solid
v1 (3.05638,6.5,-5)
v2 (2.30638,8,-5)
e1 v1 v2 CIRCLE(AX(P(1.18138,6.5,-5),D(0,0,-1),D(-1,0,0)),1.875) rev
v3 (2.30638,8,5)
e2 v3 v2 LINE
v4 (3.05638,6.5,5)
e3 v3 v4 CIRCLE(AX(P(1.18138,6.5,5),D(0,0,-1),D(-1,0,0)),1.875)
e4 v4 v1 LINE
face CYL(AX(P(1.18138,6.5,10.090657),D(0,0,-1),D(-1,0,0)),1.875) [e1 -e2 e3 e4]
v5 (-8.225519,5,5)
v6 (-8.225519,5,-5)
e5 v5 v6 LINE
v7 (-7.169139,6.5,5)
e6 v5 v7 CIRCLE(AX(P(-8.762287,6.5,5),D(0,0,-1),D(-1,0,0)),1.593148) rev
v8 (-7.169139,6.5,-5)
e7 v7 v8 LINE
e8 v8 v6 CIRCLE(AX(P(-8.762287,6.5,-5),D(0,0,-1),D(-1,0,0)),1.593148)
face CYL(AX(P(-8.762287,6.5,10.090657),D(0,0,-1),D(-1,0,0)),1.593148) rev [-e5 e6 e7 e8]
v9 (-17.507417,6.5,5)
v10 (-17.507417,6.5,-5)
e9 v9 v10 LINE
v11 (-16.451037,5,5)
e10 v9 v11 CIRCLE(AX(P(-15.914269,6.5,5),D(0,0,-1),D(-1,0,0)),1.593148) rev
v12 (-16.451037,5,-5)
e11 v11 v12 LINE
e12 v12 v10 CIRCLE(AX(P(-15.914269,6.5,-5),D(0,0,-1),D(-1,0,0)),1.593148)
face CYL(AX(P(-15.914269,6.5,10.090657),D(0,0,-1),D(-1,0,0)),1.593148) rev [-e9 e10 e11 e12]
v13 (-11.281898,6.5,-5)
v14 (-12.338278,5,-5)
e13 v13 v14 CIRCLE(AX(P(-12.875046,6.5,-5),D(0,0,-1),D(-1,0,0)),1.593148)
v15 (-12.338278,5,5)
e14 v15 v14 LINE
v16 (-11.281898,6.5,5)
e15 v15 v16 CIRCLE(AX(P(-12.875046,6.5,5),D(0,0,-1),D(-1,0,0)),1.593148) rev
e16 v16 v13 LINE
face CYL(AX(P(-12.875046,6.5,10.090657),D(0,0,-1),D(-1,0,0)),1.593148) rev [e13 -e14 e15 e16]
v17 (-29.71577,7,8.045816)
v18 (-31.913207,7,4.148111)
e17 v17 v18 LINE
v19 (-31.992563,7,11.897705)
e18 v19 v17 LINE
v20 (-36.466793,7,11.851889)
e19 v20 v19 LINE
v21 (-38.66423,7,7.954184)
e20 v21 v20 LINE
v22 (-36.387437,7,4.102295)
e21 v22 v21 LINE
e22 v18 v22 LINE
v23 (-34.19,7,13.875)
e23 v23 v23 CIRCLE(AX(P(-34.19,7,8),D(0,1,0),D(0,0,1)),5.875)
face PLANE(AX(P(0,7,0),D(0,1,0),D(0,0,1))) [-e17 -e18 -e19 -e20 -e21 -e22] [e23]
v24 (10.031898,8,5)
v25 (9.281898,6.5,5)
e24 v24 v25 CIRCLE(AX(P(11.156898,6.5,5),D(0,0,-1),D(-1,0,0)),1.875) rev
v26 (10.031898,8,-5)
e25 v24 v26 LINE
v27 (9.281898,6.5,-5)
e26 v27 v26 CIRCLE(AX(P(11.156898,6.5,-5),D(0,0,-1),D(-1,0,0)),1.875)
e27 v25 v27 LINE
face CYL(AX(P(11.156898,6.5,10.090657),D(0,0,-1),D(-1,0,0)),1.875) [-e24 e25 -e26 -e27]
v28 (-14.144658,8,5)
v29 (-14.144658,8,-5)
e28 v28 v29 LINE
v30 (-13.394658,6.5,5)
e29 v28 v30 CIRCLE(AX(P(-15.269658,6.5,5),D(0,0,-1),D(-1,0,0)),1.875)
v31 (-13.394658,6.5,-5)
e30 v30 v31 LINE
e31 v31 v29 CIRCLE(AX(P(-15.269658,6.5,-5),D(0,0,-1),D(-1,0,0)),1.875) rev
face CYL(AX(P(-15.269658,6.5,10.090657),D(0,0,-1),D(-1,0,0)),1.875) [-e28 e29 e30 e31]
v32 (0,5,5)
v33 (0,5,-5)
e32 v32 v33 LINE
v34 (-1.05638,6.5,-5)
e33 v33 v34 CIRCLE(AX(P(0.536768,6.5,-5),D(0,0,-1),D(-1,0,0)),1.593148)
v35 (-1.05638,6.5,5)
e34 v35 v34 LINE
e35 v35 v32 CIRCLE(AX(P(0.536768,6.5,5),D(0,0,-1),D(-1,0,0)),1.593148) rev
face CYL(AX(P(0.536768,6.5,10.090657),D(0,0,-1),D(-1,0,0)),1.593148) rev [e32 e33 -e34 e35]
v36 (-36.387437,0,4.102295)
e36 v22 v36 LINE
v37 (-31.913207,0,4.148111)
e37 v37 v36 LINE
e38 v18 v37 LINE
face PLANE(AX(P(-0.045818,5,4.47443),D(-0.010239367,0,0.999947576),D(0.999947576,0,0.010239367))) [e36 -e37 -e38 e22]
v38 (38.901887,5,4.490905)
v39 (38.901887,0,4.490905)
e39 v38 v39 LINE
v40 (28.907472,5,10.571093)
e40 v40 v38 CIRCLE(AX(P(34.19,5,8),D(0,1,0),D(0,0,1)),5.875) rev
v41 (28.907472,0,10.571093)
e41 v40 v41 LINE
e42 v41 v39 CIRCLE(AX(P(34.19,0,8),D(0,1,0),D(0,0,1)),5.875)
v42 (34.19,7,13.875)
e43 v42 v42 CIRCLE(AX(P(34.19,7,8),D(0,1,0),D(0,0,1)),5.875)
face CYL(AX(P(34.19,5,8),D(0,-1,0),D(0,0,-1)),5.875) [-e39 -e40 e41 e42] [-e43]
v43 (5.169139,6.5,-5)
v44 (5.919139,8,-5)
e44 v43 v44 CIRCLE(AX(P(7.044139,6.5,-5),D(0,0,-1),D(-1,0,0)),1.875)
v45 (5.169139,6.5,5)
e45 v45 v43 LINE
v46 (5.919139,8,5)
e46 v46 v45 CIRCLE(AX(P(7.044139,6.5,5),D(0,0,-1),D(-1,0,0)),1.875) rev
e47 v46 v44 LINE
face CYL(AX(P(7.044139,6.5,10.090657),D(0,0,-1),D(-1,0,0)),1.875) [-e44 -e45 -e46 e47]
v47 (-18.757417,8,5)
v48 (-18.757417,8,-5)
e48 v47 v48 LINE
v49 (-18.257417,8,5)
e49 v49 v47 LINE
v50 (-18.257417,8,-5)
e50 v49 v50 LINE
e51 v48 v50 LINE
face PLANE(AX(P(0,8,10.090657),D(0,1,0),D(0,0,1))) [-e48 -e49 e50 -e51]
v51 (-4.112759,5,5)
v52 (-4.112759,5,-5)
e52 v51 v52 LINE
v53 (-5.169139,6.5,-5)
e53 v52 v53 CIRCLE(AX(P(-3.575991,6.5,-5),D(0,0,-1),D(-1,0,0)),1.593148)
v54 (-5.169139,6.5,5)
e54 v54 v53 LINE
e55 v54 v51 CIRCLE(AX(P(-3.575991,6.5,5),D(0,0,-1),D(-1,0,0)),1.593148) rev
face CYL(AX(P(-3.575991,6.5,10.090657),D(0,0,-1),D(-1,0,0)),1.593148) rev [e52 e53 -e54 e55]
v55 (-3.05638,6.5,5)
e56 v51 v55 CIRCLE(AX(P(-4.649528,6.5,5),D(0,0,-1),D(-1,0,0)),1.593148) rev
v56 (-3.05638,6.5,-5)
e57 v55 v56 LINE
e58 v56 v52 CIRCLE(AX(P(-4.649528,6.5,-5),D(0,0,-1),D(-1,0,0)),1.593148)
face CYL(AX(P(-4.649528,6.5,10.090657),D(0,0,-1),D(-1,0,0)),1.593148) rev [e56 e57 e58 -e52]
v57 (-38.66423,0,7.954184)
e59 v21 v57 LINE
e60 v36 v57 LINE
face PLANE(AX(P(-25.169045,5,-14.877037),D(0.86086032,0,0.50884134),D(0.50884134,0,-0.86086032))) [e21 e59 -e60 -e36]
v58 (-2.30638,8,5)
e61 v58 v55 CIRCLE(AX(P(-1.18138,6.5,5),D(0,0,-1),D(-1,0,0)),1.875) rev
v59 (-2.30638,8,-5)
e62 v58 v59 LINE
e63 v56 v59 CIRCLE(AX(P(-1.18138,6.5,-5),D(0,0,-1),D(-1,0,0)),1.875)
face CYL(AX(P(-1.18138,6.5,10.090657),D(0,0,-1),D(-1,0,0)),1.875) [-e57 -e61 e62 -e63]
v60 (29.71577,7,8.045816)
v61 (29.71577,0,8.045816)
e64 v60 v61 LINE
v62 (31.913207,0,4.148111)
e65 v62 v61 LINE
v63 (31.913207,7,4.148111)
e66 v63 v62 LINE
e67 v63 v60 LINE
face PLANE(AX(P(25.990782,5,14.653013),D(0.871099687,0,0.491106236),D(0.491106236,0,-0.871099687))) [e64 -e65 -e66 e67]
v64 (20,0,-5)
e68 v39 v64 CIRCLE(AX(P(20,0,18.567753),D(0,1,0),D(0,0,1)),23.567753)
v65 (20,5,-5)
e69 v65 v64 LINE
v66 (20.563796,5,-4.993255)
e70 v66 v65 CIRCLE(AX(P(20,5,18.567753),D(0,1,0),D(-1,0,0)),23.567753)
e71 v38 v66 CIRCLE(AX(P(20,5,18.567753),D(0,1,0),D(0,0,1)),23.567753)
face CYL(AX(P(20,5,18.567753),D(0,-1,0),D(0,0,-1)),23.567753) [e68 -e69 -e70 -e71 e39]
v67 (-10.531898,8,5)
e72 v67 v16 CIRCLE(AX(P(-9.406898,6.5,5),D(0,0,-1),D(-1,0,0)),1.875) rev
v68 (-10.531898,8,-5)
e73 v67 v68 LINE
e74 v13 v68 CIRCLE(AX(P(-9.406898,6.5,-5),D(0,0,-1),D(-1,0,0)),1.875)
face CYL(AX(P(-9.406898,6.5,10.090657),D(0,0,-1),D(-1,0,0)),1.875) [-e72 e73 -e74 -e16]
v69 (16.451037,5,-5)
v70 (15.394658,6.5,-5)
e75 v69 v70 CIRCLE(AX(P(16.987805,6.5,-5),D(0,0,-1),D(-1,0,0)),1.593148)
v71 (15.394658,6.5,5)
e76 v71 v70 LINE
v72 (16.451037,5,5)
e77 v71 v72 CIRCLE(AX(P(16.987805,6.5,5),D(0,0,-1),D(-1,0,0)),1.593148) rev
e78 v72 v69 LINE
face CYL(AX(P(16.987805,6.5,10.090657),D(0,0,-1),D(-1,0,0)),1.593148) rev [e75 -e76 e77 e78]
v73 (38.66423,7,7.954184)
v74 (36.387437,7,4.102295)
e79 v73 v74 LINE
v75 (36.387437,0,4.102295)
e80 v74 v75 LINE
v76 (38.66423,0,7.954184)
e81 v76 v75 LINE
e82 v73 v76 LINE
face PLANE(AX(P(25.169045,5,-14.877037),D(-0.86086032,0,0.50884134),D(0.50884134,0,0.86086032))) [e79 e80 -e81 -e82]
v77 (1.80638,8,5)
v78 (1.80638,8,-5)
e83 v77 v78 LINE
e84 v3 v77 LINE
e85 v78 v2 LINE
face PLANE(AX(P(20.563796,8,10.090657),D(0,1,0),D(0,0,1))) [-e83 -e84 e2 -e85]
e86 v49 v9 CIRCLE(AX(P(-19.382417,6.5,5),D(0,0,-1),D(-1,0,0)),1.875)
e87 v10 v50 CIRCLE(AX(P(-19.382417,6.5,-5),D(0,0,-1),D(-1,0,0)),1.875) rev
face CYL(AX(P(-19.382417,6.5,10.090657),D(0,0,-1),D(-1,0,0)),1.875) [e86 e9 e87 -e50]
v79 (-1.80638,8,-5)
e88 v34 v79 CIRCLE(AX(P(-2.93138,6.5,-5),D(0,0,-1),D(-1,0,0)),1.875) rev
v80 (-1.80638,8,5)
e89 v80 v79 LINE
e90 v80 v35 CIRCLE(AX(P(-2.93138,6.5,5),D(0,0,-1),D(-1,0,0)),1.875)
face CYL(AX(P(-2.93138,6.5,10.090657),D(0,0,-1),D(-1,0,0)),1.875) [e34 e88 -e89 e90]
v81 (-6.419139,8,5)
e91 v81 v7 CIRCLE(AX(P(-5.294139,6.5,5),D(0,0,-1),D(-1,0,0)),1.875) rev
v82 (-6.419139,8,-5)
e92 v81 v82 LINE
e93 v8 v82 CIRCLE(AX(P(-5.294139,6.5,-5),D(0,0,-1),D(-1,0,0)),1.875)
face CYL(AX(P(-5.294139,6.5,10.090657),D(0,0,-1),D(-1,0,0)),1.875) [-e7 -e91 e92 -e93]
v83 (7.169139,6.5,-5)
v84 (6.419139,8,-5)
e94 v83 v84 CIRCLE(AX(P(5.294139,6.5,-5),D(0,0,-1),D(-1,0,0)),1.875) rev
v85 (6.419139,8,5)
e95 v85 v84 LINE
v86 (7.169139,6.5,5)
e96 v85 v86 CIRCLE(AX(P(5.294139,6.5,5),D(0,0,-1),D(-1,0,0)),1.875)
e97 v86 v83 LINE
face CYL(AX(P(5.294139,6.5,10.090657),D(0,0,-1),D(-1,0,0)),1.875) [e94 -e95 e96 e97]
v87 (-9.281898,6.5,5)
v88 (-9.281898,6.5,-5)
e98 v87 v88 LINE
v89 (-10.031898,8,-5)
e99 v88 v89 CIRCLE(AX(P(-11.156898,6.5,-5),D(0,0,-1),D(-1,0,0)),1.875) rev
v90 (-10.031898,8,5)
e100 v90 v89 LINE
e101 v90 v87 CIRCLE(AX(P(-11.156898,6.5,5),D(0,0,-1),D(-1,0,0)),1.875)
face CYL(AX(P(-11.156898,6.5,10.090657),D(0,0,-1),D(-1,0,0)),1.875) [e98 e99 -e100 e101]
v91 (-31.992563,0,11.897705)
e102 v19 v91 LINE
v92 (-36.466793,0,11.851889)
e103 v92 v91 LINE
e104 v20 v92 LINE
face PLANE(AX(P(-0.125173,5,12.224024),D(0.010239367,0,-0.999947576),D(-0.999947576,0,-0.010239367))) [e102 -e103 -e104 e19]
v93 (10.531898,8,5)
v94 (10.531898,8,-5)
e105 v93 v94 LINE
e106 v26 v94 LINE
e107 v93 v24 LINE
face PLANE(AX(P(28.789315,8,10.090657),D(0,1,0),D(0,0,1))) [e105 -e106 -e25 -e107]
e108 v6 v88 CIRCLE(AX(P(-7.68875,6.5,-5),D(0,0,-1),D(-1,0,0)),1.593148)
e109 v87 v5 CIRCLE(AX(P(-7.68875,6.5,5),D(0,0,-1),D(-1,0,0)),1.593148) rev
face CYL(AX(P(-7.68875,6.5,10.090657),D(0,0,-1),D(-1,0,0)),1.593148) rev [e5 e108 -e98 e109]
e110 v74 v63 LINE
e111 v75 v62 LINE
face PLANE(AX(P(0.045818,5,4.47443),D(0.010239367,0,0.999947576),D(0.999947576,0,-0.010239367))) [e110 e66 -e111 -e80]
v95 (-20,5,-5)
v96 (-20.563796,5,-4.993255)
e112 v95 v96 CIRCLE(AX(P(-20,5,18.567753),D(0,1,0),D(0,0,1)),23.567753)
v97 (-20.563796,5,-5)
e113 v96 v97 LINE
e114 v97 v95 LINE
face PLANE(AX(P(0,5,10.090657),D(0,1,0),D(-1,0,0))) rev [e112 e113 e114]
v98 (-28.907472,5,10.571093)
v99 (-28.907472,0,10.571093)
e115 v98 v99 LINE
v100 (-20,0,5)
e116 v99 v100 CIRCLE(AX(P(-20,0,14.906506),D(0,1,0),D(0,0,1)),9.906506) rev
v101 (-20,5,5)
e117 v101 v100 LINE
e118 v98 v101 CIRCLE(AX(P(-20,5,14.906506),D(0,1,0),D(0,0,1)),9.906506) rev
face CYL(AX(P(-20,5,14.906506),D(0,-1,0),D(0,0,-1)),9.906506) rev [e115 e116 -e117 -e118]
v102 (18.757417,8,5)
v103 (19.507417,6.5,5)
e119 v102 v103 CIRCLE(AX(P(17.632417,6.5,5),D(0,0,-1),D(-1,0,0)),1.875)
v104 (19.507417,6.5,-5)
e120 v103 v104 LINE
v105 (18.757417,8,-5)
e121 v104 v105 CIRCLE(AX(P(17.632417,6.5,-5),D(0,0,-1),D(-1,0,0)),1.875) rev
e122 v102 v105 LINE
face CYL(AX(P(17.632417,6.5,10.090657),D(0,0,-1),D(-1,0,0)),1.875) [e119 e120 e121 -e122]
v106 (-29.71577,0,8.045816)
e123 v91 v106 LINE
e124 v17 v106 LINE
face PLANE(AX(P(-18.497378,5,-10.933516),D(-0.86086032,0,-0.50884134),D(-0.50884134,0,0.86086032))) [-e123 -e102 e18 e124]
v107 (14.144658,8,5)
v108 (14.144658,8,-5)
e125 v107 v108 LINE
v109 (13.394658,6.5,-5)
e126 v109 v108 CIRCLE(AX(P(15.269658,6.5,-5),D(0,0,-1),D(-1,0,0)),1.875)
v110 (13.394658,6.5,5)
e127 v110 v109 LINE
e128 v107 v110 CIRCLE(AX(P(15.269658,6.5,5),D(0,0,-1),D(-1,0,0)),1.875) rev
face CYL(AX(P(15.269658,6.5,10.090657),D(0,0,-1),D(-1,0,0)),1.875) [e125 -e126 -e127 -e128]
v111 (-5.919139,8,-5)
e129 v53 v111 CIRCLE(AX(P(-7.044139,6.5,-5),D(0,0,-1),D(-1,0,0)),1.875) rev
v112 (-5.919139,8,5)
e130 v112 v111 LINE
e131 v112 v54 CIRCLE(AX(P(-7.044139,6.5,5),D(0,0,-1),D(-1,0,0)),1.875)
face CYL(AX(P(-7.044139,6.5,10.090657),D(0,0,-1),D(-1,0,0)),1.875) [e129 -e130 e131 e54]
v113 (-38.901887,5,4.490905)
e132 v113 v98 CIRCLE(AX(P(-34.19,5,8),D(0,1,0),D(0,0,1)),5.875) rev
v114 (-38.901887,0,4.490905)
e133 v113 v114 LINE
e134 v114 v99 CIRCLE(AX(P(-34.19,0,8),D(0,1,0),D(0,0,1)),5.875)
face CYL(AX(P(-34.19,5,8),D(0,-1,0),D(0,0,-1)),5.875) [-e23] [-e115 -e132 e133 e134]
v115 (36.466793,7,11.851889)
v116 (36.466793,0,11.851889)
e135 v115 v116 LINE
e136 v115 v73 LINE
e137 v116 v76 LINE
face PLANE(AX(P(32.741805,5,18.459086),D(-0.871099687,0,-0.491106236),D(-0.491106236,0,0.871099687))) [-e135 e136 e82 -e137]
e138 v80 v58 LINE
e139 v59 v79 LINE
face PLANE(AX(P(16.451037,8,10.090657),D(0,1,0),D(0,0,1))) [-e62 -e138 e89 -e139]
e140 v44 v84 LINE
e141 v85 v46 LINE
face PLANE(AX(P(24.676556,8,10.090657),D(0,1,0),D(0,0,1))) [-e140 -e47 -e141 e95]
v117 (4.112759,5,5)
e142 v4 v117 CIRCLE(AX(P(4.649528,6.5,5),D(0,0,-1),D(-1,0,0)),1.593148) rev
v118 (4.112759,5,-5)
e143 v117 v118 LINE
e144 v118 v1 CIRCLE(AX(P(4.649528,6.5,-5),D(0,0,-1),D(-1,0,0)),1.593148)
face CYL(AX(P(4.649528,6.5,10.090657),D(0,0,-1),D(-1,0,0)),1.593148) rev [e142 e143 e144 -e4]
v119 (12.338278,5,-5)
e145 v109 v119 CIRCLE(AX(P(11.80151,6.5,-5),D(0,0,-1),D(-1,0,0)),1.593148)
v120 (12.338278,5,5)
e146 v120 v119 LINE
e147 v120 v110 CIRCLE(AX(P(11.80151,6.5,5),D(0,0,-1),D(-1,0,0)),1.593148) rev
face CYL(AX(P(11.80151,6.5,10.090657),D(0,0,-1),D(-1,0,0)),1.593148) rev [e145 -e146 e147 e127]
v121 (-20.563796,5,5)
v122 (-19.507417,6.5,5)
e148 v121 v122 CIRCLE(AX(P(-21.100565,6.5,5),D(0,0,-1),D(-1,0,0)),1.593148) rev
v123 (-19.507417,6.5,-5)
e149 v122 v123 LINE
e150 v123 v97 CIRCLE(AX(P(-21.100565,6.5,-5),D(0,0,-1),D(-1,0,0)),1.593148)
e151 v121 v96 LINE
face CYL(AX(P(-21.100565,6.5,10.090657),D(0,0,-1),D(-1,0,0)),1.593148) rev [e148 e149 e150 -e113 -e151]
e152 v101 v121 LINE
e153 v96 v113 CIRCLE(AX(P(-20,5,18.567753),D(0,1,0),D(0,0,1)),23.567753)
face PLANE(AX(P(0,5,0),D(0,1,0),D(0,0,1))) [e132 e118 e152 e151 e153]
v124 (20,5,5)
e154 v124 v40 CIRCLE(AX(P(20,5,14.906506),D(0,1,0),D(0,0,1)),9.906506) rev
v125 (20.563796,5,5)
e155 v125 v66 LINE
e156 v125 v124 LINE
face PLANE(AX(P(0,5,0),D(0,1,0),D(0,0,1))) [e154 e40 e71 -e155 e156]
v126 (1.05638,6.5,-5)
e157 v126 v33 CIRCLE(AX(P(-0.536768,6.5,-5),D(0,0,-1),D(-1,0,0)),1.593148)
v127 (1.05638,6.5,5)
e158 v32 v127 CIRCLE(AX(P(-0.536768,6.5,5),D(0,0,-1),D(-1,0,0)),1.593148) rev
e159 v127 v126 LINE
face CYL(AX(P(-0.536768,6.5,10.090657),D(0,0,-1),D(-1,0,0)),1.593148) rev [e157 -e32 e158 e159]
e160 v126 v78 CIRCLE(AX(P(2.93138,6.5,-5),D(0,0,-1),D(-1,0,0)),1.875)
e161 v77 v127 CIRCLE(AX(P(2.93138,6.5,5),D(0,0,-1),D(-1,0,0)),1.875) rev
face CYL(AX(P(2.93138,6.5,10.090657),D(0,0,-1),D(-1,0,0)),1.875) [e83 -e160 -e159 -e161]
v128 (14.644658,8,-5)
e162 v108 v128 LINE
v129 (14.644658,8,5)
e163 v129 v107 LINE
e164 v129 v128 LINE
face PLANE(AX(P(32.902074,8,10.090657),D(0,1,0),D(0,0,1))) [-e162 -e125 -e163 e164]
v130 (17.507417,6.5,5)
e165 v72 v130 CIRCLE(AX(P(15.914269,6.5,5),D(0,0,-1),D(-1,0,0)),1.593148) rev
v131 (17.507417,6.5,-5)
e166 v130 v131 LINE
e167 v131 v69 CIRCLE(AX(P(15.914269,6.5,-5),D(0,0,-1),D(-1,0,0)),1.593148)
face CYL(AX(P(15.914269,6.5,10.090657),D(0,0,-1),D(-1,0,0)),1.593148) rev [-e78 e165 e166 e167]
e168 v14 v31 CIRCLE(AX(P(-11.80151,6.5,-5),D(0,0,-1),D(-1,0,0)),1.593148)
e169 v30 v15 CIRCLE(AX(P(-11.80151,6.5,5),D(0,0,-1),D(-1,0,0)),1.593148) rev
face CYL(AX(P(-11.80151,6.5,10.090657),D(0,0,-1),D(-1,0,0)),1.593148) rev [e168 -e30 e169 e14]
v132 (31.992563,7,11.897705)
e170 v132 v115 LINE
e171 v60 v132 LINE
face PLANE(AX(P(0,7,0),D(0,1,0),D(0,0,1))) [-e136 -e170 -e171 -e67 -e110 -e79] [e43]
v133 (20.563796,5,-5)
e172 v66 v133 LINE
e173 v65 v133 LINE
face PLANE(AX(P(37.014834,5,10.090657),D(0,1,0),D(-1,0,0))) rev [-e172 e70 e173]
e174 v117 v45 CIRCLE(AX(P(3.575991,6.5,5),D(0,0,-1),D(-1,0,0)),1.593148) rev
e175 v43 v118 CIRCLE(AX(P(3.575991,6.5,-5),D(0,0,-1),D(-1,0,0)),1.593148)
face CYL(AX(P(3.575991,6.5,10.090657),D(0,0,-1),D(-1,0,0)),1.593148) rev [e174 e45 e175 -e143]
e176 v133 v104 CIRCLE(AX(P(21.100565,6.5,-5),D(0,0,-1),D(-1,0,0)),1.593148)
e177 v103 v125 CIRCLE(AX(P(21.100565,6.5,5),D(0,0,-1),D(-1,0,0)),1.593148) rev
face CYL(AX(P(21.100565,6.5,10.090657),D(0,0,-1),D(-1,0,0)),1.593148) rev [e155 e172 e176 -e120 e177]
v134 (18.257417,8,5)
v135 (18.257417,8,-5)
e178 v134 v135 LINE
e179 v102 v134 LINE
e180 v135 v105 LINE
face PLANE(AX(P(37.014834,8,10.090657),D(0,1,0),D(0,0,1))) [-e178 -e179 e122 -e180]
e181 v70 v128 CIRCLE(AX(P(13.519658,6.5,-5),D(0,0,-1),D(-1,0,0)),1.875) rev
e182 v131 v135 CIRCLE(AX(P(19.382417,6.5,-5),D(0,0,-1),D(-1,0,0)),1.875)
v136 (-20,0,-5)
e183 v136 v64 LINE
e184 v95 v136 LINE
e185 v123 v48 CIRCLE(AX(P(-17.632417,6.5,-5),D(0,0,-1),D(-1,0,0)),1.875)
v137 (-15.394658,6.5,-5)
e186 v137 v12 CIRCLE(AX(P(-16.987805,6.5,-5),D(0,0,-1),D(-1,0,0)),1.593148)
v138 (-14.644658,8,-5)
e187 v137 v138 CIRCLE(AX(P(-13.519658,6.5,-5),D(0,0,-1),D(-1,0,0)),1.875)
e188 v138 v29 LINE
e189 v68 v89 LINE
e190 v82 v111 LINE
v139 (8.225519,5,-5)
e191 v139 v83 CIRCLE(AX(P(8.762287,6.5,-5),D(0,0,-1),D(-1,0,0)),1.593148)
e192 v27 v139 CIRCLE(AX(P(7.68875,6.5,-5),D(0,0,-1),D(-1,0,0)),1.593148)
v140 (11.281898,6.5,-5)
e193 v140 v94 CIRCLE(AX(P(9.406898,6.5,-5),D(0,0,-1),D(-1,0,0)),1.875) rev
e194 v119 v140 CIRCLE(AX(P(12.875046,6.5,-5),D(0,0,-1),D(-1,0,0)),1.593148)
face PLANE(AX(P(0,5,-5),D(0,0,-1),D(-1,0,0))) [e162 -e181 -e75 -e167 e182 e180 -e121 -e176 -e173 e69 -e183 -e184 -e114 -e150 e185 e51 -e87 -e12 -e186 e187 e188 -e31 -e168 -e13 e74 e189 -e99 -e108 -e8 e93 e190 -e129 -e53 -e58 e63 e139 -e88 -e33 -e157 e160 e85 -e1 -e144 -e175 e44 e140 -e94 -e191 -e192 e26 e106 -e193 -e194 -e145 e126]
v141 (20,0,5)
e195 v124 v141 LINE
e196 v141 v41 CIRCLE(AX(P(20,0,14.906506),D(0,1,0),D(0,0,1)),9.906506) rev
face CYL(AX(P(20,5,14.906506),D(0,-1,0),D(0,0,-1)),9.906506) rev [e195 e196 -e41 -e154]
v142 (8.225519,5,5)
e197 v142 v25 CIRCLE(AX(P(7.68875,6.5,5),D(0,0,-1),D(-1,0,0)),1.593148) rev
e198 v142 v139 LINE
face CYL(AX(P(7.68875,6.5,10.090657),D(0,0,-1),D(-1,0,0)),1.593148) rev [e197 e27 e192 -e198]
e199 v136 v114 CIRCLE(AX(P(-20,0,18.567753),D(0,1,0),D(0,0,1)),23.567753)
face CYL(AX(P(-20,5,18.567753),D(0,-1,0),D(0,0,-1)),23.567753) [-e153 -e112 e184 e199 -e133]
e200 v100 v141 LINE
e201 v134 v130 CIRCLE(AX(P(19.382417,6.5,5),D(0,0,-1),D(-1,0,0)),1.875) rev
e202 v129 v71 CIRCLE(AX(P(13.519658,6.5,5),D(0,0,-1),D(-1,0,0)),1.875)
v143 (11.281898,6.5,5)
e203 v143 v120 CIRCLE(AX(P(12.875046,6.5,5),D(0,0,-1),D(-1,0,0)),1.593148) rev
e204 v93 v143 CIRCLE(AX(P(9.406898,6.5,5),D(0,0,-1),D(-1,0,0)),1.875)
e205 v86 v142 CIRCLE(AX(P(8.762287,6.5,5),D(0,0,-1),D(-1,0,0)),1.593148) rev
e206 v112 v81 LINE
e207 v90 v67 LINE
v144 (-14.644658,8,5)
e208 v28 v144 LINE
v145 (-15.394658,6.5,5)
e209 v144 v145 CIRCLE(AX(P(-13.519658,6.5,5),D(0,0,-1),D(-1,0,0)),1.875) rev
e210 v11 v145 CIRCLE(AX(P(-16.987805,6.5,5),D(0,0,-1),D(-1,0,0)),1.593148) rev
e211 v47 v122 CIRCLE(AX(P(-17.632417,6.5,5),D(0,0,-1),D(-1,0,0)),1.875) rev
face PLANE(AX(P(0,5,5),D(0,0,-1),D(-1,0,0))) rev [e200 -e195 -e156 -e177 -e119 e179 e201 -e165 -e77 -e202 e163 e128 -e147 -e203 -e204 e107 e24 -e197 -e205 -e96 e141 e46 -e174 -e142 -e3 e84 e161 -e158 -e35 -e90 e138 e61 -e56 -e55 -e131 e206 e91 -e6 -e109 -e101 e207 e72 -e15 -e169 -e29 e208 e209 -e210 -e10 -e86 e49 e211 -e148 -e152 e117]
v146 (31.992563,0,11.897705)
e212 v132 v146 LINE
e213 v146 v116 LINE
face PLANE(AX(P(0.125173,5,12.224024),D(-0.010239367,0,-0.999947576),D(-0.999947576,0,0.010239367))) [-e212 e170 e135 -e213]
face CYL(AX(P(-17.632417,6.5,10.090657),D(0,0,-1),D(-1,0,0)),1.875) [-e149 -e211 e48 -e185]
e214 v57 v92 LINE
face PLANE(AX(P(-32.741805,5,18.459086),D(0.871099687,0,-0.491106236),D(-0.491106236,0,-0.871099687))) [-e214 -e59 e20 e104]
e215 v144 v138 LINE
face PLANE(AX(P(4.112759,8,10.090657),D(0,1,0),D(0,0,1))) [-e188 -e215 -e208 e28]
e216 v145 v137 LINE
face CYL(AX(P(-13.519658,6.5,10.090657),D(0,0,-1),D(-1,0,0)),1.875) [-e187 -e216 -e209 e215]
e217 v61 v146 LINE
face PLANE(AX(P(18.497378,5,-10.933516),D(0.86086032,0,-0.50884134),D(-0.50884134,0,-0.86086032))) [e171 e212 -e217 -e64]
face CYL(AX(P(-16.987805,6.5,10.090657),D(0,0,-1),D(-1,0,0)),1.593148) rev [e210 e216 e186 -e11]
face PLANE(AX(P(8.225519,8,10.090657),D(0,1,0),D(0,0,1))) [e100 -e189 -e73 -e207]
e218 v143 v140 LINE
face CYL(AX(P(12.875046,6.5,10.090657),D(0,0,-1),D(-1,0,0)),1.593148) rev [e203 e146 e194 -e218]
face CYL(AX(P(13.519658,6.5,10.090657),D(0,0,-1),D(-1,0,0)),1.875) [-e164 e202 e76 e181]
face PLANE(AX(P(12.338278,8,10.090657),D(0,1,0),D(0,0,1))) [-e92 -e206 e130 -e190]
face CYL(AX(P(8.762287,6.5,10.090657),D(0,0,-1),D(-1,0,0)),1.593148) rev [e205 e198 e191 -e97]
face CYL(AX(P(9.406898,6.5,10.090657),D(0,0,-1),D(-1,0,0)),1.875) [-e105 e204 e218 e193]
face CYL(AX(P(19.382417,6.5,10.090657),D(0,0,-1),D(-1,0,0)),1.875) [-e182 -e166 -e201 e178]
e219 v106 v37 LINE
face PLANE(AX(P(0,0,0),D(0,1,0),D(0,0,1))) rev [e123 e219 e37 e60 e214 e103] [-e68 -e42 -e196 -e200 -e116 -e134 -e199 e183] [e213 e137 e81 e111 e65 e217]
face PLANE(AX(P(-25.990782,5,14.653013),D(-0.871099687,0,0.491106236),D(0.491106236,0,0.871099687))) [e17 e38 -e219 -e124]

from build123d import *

# Parameters (mm, degrees)
BOSS_EXTRUDE1_DEPTH             = 5
BOSS_EXTRUDE2_REACH             = 44.693
SKETCH2_W                       = 1
SKETCH2_H                       = 1.5
BOSS_EXTRUDE2_DIRECTION_2_REACH = 44.693
LPATTERN1_COUNT                 = 10
LPATTERN1_PITCH                 = 4.112759299
BOSS_EXTRUDE3_START             = 5
BOSS_EXTRUDE3_OUTLINE_R         = 5.875
BOSS_EXTRUDE3_DEPTH             = 2


# Read off the part's stored shape, not the designer's step: Boss-Extrude3
with BuildPart() as part:
    # Sketch1 → Boss-Extrude1 (new body)
    with BuildSketch(Plane(origin=(0, 0, 0), x_dir=(1, 0, 0), z_dir=(0, 1, 0))):
        with BuildLine():
            ThreePointArc((-38.901886937, -4.490905174), (-37.243453661, -13.019167833), (-28.907471708, -10.571093123))
            ThreePointArc((-28.907471708, -10.571093123), (-25.253097439, -6.507468715), (-20, -5))
            Line((-20, -5), (20, -5))
            ThreePointArc((20, -5), (25.253097439, -6.507468715), (28.907471708, -10.571093123))
            ThreePointArc((28.907471708, -10.571093123), (37.243453661, -13.019167833), (38.901886937, -4.490905174))
            ThreePointArc((38.901886937, -4.490905174), (30.575426833, 2.494044808), (20, 5))
            Line((20, 5), (-20, 5))
            ThreePointArc((-20, 5), (-30.575426833, 2.494044808), (-38.901886937, -4.490905174))
        make_face()
        Polygon((-31.913207445, -4.148110984), (-30.814488671, -6.096963409), (-29.715769982, -8.045815684), (-31.992562537, -11.8977047), (-36.466792555, -11.851889016), (-38.664230018, -7.954184316), (-36.387437463, -4.1022953), align=None, mode=Mode.SUBTRACT)
        Polygon((30.814488669, -6.096963413), (31.913207445, -4.148110984), (36.387437463, -4.1022953), (38.664230018, -7.954184316), (36.466792555, -11.851889016), (31.992562537, -11.8977047), (29.715769982, -8.045815684), align=None, mode=Mode.SUBTRACT)
    extrude(amount=BOSS_EXTRUDE1_DEPTH)

    # Boss-Extrude2: up to this face of the body (flat: up to its plane)
    boss_extrude2_end = Plane(part.part.faces().sort_by_distance((0, 2.5, 5))[0])
    # Sketch2 → Boss-Extrude2 (add, up to the picked face)
    with BuildSketch(Plane.XY, mode=Mode.PRIVATE) as boss_extrude2_sk1:
        with BuildLine():
            ThreePointArc((-19.507416847, 6.5), (-19.798015047, 5.582675362), (-20.563796496, 5))
            Line((-20.563796496, 5), (-18.507416847, 5))
            Line((-18.507416847, 5), (-18.507416847, 6.5))
            Line((-18.507416847, 6.5), (-19.507416847, 6.5))
        make_face()
    boss_extrude2_tool1 = split(extrude(boss_extrude2_sk1.sketch, amount=BOSS_EXTRUDE2_REACH, mode=Mode.PRIVATE), bisect_by=boss_extrude2_end, keep=Keep.BOTH, mode=Mode.PRIVATE)
    # Sketch2 → Boss-Extrude2 (add, up to the picked face)
    with BuildSketch(Plane.XY, mode=Mode.PRIVATE) as boss_extrude2_sk2:
        with Locations((-18.007416847, 5.75)):
            Rectangle(SKETCH2_W, SKETCH2_H)
    boss_extrude2_tool2 = split(extrude(boss_extrude2_sk2.sketch, amount=BOSS_EXTRUDE2_REACH, mode=Mode.PRIVATE), bisect_by=boss_extrude2_end, keep=Keep.BOTH, mode=Mode.PRIVATE)
    # Sketch2 → Boss-Extrude2 (add, up to the picked face)
    with BuildSketch(Plane.XY, mode=Mode.PRIVATE) as boss_extrude2_sk3:
        with BuildLine():
            Line((-17.507416847, 6.5), (-17.507416847, 5))
            Line((-17.507416847, 5), (-16.451037197, 5))
            ThreePointArc((-16.451037197, 5), (-17.216818646, 5.582675362), (-17.507416847, 6.5))
        make_face()
    boss_extrude2_tool3 = split(extrude(boss_extrude2_sk3.sketch, amount=BOSS_EXTRUDE2_REACH, mode=Mode.PRIVATE), bisect_by=boss_extrude2_end, keep=Keep.BOTH, mode=Mode.PRIVATE)
    # Sketch2 → Boss-Extrude2 (add, up to the picked face)
    with BuildSketch(Plane.XY, mode=Mode.PRIVATE) as boss_extrude2_sk4:
        with BuildLine():
            Line((-18.507416847, 8), (-18.507416847, 6.5))
            Line((-18.507416847, 6.5), (-17.507416847, 6.5))
            ThreePointArc((-17.507416847, 6.5), (-17.705365863, 7.338525492), (-18.257416847, 8))
            Line((-18.257416847, 8), (-18.507416847, 8))
        make_face()
    boss_extrude2_tool4 = split(extrude(boss_extrude2_sk4.sketch, amount=BOSS_EXTRUDE2_REACH, mode=Mode.PRIVATE), bisect_by=boss_extrude2_end, keep=Keep.BOTH, mode=Mode.PRIVATE)
    # Sketch2 → Boss-Extrude2 (add, up to the picked face)
    with BuildSketch(Plane.XY, mode=Mode.PRIVATE) as boss_extrude2_sk5:
        with BuildLine():
            ThreePointArc((-18.757416847, 8), (-19.30946783, 7.338525492), (-19.507416847, 6.5))
            Line((-19.507416847, 6.5), (-18.507416847, 6.5))
            Line((-18.507416847, 6.5), (-18.507416847, 8))
            Line((-18.507416847, 8), (-18.757416847, 8))
        make_face()
    boss_extrude2_tool5 = split(extrude(boss_extrude2_sk5.sketch, amount=BOSS_EXTRUDE2_REACH, mode=Mode.PRIVATE), bisect_by=boss_extrude2_end, keep=Keep.BOTH, mode=Mode.PRIVATE)
    boss_extrude2_1 = boss_extrude2_tool1.solids().sort_by(Axis((-19.182136, 5.660038, 0), (0, 0, 1)))[0]
    add(boss_extrude2_1)
    boss_extrude2_2 = boss_extrude2_tool2.solids().sort_by(Axis((-18.007417, 5.75, 0), (0, 0, 1)))[0]
    add(boss_extrude2_2)
    boss_extrude2_3 = boss_extrude2_tool3.solids().sort_by(Axis((-17.222958, 5.346083, 0), (0, 0, 1)))[0]
    add(boss_extrude2_3)
    boss_extrude2_4 = boss_extrude2_tool4.solids().sort_by(Axis((-18.090718, 7.135758, 0), (0, 0, 1)))[0]
    add(boss_extrude2_4)
    boss_extrude2_5 = boss_extrude2_tool5.solids().sort_by(Axis((-18.924116, 7.135758, 0), (0, 0, 1)))[0]
    add(boss_extrude2_5)
    boss_extrude2 = boss_extrude2_1 + boss_extrude2_2 + boss_extrude2_3 + boss_extrude2_4 + boss_extrude2_5  # Boss-Extrude2 as one shape, for the pattern or mirror that repeats it

    # Boss-Extrude2 direction 2: up to this face of the body (flat: up to its plane)
    boss_extrude2_direction_2_end = Plane(part.part.faces().sort_by_distance((0, 2.5, -5))[0])
    # Sketch2 → Boss-Extrude2 direction 2 (add, up to the picked face)
    with BuildSketch(Plane.XY, mode=Mode.PRIVATE) as boss_extrude2_direction_2_sk1:
        with BuildLine():
            ThreePointArc((-19.507416847, 6.5), (-19.798015047, 5.582675362), (-20.563796496, 5))
            Line((-20.563796496, 5), (-18.507416847, 5))
            Line((-18.507416847, 5), (-18.507416847, 6.5))
            Line((-18.507416847, 6.5), (-19.507416847, 6.5))
        make_face()
    boss_extrude2_direction_2_tool1 = split(extrude(boss_extrude2_direction_2_sk1.sketch, amount=-BOSS_EXTRUDE2_DIRECTION_2_REACH, mode=Mode.PRIVATE), bisect_by=boss_extrude2_direction_2_end, keep=Keep.BOTH, mode=Mode.PRIVATE)
    # Sketch2 → Boss-Extrude2 direction 2 (add, up to the picked face)
    with BuildSketch(Plane.XY, mode=Mode.PRIVATE) as boss_extrude2_direction_2_sk2:
        with Locations((-18.007416847, 5.75)):
            Rectangle(SKETCH2_W, SKETCH2_H)
    boss_extrude2_direction_2_tool2 = split(extrude(boss_extrude2_direction_2_sk2.sketch, amount=-BOSS_EXTRUDE2_DIRECTION_2_REACH, mode=Mode.PRIVATE), bisect_by=boss_extrude2_direction_2_end, keep=Keep.BOTH, mode=Mode.PRIVATE)
    # Sketch2 → Boss-Extrude2 direction 2 (add, up to the picked face)
    with BuildSketch(Plane.XY, mode=Mode.PRIVATE) as boss_extrude2_direction_2_sk3:
        with BuildLine():
            Line((-17.507416847, 6.5), (-17.507416847, 5))
            Line((-17.507416847, 5), (-16.451037197, 5))
            ThreePointArc((-16.451037197, 5), (-17.216818646, 5.582675362), (-17.507416847, 6.5))
        make_face()
    boss_extrude2_direction_2_tool3 = split(extrude(boss_extrude2_direction_2_sk3.sketch, amount=-BOSS_EXTRUDE2_DIRECTION_2_REACH, mode=Mode.PRIVATE), bisect_by=boss_extrude2_direction_2_end, keep=Keep.BOTH, mode=Mode.PRIVATE)
    # Sketch2 → Boss-Extrude2 direction 2 (add, up to the picked face)
    with BuildSketch(Plane.XY, mode=Mode.PRIVATE) as boss_extrude2_direction_2_sk4:
        with BuildLine():
            Line((-18.507416847, 8), (-18.507416847, 6.5))
            Line((-18.507416847, 6.5), (-17.507416847, 6.5))
            ThreePointArc((-17.507416847, 6.5), (-17.705365863, 7.338525492), (-18.257416847, 8))
            Line((-18.257416847, 8), (-18.507416847, 8))
        make_face()
    boss_extrude2_direction_2_tool4 = split(extrude(boss_extrude2_direction_2_sk4.sketch, amount=-BOSS_EXTRUDE2_DIRECTION_2_REACH, mode=Mode.PRIVATE), bisect_by=boss_extrude2_direction_2_end, keep=Keep.BOTH, mode=Mode.PRIVATE)
    # Sketch2 → Boss-Extrude2 direction 2 (add, up to the picked face)
    with BuildSketch(Plane.XY, mode=Mode.PRIVATE) as boss_extrude2_direction_2_sk5:
        with BuildLine():
            ThreePointArc((-18.757416847, 8), (-19.30946783, 7.338525492), (-19.507416847, 6.5))
            Line((-19.507416847, 6.5), (-18.507416847, 6.5))
            Line((-18.507416847, 6.5), (-18.507416847, 8))
            Line((-18.507416847, 8), (-18.757416847, 8))
        make_face()
    boss_extrude2_direction_2_tool5 = split(extrude(boss_extrude2_direction_2_sk5.sketch, amount=-BOSS_EXTRUDE2_DIRECTION_2_REACH, mode=Mode.PRIVATE), bisect_by=boss_extrude2_direction_2_end, keep=Keep.BOTH, mode=Mode.PRIVATE)
    boss_extrude2_direction_2_1 = boss_extrude2_direction_2_tool1.solids().sort_by(Axis((-19.182136, 5.660038, 0), (0, 0, -1)))[0]
    add(boss_extrude2_direction_2_1)
    boss_extrude2_direction_2_2 = boss_extrude2_direction_2_tool2.solids().sort_by(Axis((-18.007417, 5.75, 0), (0, 0, -1)))[0]
    add(boss_extrude2_direction_2_2)
    boss_extrude2_direction_2_3 = boss_extrude2_direction_2_tool3.solids().sort_by(Axis((-17.222958, 5.346083, 0), (0, 0, -1)))[0]
    add(boss_extrude2_direction_2_3)
    boss_extrude2_direction_2_4 = boss_extrude2_direction_2_tool4.solids().sort_by(Axis((-18.090718, 7.135758, 0), (0, 0, -1)))[0]
    add(boss_extrude2_direction_2_4)
    boss_extrude2_direction_2_5 = boss_extrude2_direction_2_tool5.solids().sort_by(Axis((-18.924116, 7.135758, 0), (0, 0, -1)))[0]
    add(boss_extrude2_direction_2_5)
    boss_extrude2_direction_2 = boss_extrude2_direction_2_1 + boss_extrude2_direction_2_2 + boss_extrude2_direction_2_3 + boss_extrude2_direction_2_4 + boss_extrude2_direction_2_5  # Boss-Extrude2 direction 2 as one shape, for the pattern or mirror that repeats it

    # LPattern1: Boss-Extrude2, Boss-Extrude2 direction 2 ×10
    with Locations(*[(i * LPATTERN1_PITCH, 0, 0) for i in range(1, LPATTERN1_COUNT)]):
        add(boss_extrude2)
        add(boss_extrude2_direction_2)

    # Boss-Extrude3 outline → Boss-Extrude3 (add)
    # profile 1 of 2: a face of its own
    with BuildSketch(Plane(origin=(0, 0, 0), x_dir=(1, 0, 0), z_dir=(0, 1, 0)).offset(BOSS_EXTRUDE3_START)):
        with Locations((34.19, -8)):
            Circle(BOSS_EXTRUDE3_OUTLINE_R)
        Polygon((36.466792555, -11.851889016), (31.992562537, -11.8977047), (29.715769982, -8.045815684), (31.913207445, -4.148110984), (36.387437463, -4.1022953), (38.664230018, -7.954184316), align=None, mode=Mode.SUBTRACT)
    # profile 2 of 2: a face of its own
    with BuildSketch(Plane(origin=(0, 0, 0), x_dir=(1, 0, 0), z_dir=(0, 1, 0)).offset(BOSS_EXTRUDE3_START)):
        with Locations((-34.19, -8)):
            Circle(BOSS_EXTRUDE3_OUTLINE_R)
        Polygon((-38.664230018, -7.954184316), (-36.387437463, -4.1022953), (-31.913207445, -4.148110984), (-29.715769982, -8.045815684), (-31.992562537, -11.8977047), (-36.466792555, -11.851889016), align=None, mode=Mode.SUBTRACT)
    extrude(amount=BOSS_EXTRUDE3_DEPTH)


solid = part.part
